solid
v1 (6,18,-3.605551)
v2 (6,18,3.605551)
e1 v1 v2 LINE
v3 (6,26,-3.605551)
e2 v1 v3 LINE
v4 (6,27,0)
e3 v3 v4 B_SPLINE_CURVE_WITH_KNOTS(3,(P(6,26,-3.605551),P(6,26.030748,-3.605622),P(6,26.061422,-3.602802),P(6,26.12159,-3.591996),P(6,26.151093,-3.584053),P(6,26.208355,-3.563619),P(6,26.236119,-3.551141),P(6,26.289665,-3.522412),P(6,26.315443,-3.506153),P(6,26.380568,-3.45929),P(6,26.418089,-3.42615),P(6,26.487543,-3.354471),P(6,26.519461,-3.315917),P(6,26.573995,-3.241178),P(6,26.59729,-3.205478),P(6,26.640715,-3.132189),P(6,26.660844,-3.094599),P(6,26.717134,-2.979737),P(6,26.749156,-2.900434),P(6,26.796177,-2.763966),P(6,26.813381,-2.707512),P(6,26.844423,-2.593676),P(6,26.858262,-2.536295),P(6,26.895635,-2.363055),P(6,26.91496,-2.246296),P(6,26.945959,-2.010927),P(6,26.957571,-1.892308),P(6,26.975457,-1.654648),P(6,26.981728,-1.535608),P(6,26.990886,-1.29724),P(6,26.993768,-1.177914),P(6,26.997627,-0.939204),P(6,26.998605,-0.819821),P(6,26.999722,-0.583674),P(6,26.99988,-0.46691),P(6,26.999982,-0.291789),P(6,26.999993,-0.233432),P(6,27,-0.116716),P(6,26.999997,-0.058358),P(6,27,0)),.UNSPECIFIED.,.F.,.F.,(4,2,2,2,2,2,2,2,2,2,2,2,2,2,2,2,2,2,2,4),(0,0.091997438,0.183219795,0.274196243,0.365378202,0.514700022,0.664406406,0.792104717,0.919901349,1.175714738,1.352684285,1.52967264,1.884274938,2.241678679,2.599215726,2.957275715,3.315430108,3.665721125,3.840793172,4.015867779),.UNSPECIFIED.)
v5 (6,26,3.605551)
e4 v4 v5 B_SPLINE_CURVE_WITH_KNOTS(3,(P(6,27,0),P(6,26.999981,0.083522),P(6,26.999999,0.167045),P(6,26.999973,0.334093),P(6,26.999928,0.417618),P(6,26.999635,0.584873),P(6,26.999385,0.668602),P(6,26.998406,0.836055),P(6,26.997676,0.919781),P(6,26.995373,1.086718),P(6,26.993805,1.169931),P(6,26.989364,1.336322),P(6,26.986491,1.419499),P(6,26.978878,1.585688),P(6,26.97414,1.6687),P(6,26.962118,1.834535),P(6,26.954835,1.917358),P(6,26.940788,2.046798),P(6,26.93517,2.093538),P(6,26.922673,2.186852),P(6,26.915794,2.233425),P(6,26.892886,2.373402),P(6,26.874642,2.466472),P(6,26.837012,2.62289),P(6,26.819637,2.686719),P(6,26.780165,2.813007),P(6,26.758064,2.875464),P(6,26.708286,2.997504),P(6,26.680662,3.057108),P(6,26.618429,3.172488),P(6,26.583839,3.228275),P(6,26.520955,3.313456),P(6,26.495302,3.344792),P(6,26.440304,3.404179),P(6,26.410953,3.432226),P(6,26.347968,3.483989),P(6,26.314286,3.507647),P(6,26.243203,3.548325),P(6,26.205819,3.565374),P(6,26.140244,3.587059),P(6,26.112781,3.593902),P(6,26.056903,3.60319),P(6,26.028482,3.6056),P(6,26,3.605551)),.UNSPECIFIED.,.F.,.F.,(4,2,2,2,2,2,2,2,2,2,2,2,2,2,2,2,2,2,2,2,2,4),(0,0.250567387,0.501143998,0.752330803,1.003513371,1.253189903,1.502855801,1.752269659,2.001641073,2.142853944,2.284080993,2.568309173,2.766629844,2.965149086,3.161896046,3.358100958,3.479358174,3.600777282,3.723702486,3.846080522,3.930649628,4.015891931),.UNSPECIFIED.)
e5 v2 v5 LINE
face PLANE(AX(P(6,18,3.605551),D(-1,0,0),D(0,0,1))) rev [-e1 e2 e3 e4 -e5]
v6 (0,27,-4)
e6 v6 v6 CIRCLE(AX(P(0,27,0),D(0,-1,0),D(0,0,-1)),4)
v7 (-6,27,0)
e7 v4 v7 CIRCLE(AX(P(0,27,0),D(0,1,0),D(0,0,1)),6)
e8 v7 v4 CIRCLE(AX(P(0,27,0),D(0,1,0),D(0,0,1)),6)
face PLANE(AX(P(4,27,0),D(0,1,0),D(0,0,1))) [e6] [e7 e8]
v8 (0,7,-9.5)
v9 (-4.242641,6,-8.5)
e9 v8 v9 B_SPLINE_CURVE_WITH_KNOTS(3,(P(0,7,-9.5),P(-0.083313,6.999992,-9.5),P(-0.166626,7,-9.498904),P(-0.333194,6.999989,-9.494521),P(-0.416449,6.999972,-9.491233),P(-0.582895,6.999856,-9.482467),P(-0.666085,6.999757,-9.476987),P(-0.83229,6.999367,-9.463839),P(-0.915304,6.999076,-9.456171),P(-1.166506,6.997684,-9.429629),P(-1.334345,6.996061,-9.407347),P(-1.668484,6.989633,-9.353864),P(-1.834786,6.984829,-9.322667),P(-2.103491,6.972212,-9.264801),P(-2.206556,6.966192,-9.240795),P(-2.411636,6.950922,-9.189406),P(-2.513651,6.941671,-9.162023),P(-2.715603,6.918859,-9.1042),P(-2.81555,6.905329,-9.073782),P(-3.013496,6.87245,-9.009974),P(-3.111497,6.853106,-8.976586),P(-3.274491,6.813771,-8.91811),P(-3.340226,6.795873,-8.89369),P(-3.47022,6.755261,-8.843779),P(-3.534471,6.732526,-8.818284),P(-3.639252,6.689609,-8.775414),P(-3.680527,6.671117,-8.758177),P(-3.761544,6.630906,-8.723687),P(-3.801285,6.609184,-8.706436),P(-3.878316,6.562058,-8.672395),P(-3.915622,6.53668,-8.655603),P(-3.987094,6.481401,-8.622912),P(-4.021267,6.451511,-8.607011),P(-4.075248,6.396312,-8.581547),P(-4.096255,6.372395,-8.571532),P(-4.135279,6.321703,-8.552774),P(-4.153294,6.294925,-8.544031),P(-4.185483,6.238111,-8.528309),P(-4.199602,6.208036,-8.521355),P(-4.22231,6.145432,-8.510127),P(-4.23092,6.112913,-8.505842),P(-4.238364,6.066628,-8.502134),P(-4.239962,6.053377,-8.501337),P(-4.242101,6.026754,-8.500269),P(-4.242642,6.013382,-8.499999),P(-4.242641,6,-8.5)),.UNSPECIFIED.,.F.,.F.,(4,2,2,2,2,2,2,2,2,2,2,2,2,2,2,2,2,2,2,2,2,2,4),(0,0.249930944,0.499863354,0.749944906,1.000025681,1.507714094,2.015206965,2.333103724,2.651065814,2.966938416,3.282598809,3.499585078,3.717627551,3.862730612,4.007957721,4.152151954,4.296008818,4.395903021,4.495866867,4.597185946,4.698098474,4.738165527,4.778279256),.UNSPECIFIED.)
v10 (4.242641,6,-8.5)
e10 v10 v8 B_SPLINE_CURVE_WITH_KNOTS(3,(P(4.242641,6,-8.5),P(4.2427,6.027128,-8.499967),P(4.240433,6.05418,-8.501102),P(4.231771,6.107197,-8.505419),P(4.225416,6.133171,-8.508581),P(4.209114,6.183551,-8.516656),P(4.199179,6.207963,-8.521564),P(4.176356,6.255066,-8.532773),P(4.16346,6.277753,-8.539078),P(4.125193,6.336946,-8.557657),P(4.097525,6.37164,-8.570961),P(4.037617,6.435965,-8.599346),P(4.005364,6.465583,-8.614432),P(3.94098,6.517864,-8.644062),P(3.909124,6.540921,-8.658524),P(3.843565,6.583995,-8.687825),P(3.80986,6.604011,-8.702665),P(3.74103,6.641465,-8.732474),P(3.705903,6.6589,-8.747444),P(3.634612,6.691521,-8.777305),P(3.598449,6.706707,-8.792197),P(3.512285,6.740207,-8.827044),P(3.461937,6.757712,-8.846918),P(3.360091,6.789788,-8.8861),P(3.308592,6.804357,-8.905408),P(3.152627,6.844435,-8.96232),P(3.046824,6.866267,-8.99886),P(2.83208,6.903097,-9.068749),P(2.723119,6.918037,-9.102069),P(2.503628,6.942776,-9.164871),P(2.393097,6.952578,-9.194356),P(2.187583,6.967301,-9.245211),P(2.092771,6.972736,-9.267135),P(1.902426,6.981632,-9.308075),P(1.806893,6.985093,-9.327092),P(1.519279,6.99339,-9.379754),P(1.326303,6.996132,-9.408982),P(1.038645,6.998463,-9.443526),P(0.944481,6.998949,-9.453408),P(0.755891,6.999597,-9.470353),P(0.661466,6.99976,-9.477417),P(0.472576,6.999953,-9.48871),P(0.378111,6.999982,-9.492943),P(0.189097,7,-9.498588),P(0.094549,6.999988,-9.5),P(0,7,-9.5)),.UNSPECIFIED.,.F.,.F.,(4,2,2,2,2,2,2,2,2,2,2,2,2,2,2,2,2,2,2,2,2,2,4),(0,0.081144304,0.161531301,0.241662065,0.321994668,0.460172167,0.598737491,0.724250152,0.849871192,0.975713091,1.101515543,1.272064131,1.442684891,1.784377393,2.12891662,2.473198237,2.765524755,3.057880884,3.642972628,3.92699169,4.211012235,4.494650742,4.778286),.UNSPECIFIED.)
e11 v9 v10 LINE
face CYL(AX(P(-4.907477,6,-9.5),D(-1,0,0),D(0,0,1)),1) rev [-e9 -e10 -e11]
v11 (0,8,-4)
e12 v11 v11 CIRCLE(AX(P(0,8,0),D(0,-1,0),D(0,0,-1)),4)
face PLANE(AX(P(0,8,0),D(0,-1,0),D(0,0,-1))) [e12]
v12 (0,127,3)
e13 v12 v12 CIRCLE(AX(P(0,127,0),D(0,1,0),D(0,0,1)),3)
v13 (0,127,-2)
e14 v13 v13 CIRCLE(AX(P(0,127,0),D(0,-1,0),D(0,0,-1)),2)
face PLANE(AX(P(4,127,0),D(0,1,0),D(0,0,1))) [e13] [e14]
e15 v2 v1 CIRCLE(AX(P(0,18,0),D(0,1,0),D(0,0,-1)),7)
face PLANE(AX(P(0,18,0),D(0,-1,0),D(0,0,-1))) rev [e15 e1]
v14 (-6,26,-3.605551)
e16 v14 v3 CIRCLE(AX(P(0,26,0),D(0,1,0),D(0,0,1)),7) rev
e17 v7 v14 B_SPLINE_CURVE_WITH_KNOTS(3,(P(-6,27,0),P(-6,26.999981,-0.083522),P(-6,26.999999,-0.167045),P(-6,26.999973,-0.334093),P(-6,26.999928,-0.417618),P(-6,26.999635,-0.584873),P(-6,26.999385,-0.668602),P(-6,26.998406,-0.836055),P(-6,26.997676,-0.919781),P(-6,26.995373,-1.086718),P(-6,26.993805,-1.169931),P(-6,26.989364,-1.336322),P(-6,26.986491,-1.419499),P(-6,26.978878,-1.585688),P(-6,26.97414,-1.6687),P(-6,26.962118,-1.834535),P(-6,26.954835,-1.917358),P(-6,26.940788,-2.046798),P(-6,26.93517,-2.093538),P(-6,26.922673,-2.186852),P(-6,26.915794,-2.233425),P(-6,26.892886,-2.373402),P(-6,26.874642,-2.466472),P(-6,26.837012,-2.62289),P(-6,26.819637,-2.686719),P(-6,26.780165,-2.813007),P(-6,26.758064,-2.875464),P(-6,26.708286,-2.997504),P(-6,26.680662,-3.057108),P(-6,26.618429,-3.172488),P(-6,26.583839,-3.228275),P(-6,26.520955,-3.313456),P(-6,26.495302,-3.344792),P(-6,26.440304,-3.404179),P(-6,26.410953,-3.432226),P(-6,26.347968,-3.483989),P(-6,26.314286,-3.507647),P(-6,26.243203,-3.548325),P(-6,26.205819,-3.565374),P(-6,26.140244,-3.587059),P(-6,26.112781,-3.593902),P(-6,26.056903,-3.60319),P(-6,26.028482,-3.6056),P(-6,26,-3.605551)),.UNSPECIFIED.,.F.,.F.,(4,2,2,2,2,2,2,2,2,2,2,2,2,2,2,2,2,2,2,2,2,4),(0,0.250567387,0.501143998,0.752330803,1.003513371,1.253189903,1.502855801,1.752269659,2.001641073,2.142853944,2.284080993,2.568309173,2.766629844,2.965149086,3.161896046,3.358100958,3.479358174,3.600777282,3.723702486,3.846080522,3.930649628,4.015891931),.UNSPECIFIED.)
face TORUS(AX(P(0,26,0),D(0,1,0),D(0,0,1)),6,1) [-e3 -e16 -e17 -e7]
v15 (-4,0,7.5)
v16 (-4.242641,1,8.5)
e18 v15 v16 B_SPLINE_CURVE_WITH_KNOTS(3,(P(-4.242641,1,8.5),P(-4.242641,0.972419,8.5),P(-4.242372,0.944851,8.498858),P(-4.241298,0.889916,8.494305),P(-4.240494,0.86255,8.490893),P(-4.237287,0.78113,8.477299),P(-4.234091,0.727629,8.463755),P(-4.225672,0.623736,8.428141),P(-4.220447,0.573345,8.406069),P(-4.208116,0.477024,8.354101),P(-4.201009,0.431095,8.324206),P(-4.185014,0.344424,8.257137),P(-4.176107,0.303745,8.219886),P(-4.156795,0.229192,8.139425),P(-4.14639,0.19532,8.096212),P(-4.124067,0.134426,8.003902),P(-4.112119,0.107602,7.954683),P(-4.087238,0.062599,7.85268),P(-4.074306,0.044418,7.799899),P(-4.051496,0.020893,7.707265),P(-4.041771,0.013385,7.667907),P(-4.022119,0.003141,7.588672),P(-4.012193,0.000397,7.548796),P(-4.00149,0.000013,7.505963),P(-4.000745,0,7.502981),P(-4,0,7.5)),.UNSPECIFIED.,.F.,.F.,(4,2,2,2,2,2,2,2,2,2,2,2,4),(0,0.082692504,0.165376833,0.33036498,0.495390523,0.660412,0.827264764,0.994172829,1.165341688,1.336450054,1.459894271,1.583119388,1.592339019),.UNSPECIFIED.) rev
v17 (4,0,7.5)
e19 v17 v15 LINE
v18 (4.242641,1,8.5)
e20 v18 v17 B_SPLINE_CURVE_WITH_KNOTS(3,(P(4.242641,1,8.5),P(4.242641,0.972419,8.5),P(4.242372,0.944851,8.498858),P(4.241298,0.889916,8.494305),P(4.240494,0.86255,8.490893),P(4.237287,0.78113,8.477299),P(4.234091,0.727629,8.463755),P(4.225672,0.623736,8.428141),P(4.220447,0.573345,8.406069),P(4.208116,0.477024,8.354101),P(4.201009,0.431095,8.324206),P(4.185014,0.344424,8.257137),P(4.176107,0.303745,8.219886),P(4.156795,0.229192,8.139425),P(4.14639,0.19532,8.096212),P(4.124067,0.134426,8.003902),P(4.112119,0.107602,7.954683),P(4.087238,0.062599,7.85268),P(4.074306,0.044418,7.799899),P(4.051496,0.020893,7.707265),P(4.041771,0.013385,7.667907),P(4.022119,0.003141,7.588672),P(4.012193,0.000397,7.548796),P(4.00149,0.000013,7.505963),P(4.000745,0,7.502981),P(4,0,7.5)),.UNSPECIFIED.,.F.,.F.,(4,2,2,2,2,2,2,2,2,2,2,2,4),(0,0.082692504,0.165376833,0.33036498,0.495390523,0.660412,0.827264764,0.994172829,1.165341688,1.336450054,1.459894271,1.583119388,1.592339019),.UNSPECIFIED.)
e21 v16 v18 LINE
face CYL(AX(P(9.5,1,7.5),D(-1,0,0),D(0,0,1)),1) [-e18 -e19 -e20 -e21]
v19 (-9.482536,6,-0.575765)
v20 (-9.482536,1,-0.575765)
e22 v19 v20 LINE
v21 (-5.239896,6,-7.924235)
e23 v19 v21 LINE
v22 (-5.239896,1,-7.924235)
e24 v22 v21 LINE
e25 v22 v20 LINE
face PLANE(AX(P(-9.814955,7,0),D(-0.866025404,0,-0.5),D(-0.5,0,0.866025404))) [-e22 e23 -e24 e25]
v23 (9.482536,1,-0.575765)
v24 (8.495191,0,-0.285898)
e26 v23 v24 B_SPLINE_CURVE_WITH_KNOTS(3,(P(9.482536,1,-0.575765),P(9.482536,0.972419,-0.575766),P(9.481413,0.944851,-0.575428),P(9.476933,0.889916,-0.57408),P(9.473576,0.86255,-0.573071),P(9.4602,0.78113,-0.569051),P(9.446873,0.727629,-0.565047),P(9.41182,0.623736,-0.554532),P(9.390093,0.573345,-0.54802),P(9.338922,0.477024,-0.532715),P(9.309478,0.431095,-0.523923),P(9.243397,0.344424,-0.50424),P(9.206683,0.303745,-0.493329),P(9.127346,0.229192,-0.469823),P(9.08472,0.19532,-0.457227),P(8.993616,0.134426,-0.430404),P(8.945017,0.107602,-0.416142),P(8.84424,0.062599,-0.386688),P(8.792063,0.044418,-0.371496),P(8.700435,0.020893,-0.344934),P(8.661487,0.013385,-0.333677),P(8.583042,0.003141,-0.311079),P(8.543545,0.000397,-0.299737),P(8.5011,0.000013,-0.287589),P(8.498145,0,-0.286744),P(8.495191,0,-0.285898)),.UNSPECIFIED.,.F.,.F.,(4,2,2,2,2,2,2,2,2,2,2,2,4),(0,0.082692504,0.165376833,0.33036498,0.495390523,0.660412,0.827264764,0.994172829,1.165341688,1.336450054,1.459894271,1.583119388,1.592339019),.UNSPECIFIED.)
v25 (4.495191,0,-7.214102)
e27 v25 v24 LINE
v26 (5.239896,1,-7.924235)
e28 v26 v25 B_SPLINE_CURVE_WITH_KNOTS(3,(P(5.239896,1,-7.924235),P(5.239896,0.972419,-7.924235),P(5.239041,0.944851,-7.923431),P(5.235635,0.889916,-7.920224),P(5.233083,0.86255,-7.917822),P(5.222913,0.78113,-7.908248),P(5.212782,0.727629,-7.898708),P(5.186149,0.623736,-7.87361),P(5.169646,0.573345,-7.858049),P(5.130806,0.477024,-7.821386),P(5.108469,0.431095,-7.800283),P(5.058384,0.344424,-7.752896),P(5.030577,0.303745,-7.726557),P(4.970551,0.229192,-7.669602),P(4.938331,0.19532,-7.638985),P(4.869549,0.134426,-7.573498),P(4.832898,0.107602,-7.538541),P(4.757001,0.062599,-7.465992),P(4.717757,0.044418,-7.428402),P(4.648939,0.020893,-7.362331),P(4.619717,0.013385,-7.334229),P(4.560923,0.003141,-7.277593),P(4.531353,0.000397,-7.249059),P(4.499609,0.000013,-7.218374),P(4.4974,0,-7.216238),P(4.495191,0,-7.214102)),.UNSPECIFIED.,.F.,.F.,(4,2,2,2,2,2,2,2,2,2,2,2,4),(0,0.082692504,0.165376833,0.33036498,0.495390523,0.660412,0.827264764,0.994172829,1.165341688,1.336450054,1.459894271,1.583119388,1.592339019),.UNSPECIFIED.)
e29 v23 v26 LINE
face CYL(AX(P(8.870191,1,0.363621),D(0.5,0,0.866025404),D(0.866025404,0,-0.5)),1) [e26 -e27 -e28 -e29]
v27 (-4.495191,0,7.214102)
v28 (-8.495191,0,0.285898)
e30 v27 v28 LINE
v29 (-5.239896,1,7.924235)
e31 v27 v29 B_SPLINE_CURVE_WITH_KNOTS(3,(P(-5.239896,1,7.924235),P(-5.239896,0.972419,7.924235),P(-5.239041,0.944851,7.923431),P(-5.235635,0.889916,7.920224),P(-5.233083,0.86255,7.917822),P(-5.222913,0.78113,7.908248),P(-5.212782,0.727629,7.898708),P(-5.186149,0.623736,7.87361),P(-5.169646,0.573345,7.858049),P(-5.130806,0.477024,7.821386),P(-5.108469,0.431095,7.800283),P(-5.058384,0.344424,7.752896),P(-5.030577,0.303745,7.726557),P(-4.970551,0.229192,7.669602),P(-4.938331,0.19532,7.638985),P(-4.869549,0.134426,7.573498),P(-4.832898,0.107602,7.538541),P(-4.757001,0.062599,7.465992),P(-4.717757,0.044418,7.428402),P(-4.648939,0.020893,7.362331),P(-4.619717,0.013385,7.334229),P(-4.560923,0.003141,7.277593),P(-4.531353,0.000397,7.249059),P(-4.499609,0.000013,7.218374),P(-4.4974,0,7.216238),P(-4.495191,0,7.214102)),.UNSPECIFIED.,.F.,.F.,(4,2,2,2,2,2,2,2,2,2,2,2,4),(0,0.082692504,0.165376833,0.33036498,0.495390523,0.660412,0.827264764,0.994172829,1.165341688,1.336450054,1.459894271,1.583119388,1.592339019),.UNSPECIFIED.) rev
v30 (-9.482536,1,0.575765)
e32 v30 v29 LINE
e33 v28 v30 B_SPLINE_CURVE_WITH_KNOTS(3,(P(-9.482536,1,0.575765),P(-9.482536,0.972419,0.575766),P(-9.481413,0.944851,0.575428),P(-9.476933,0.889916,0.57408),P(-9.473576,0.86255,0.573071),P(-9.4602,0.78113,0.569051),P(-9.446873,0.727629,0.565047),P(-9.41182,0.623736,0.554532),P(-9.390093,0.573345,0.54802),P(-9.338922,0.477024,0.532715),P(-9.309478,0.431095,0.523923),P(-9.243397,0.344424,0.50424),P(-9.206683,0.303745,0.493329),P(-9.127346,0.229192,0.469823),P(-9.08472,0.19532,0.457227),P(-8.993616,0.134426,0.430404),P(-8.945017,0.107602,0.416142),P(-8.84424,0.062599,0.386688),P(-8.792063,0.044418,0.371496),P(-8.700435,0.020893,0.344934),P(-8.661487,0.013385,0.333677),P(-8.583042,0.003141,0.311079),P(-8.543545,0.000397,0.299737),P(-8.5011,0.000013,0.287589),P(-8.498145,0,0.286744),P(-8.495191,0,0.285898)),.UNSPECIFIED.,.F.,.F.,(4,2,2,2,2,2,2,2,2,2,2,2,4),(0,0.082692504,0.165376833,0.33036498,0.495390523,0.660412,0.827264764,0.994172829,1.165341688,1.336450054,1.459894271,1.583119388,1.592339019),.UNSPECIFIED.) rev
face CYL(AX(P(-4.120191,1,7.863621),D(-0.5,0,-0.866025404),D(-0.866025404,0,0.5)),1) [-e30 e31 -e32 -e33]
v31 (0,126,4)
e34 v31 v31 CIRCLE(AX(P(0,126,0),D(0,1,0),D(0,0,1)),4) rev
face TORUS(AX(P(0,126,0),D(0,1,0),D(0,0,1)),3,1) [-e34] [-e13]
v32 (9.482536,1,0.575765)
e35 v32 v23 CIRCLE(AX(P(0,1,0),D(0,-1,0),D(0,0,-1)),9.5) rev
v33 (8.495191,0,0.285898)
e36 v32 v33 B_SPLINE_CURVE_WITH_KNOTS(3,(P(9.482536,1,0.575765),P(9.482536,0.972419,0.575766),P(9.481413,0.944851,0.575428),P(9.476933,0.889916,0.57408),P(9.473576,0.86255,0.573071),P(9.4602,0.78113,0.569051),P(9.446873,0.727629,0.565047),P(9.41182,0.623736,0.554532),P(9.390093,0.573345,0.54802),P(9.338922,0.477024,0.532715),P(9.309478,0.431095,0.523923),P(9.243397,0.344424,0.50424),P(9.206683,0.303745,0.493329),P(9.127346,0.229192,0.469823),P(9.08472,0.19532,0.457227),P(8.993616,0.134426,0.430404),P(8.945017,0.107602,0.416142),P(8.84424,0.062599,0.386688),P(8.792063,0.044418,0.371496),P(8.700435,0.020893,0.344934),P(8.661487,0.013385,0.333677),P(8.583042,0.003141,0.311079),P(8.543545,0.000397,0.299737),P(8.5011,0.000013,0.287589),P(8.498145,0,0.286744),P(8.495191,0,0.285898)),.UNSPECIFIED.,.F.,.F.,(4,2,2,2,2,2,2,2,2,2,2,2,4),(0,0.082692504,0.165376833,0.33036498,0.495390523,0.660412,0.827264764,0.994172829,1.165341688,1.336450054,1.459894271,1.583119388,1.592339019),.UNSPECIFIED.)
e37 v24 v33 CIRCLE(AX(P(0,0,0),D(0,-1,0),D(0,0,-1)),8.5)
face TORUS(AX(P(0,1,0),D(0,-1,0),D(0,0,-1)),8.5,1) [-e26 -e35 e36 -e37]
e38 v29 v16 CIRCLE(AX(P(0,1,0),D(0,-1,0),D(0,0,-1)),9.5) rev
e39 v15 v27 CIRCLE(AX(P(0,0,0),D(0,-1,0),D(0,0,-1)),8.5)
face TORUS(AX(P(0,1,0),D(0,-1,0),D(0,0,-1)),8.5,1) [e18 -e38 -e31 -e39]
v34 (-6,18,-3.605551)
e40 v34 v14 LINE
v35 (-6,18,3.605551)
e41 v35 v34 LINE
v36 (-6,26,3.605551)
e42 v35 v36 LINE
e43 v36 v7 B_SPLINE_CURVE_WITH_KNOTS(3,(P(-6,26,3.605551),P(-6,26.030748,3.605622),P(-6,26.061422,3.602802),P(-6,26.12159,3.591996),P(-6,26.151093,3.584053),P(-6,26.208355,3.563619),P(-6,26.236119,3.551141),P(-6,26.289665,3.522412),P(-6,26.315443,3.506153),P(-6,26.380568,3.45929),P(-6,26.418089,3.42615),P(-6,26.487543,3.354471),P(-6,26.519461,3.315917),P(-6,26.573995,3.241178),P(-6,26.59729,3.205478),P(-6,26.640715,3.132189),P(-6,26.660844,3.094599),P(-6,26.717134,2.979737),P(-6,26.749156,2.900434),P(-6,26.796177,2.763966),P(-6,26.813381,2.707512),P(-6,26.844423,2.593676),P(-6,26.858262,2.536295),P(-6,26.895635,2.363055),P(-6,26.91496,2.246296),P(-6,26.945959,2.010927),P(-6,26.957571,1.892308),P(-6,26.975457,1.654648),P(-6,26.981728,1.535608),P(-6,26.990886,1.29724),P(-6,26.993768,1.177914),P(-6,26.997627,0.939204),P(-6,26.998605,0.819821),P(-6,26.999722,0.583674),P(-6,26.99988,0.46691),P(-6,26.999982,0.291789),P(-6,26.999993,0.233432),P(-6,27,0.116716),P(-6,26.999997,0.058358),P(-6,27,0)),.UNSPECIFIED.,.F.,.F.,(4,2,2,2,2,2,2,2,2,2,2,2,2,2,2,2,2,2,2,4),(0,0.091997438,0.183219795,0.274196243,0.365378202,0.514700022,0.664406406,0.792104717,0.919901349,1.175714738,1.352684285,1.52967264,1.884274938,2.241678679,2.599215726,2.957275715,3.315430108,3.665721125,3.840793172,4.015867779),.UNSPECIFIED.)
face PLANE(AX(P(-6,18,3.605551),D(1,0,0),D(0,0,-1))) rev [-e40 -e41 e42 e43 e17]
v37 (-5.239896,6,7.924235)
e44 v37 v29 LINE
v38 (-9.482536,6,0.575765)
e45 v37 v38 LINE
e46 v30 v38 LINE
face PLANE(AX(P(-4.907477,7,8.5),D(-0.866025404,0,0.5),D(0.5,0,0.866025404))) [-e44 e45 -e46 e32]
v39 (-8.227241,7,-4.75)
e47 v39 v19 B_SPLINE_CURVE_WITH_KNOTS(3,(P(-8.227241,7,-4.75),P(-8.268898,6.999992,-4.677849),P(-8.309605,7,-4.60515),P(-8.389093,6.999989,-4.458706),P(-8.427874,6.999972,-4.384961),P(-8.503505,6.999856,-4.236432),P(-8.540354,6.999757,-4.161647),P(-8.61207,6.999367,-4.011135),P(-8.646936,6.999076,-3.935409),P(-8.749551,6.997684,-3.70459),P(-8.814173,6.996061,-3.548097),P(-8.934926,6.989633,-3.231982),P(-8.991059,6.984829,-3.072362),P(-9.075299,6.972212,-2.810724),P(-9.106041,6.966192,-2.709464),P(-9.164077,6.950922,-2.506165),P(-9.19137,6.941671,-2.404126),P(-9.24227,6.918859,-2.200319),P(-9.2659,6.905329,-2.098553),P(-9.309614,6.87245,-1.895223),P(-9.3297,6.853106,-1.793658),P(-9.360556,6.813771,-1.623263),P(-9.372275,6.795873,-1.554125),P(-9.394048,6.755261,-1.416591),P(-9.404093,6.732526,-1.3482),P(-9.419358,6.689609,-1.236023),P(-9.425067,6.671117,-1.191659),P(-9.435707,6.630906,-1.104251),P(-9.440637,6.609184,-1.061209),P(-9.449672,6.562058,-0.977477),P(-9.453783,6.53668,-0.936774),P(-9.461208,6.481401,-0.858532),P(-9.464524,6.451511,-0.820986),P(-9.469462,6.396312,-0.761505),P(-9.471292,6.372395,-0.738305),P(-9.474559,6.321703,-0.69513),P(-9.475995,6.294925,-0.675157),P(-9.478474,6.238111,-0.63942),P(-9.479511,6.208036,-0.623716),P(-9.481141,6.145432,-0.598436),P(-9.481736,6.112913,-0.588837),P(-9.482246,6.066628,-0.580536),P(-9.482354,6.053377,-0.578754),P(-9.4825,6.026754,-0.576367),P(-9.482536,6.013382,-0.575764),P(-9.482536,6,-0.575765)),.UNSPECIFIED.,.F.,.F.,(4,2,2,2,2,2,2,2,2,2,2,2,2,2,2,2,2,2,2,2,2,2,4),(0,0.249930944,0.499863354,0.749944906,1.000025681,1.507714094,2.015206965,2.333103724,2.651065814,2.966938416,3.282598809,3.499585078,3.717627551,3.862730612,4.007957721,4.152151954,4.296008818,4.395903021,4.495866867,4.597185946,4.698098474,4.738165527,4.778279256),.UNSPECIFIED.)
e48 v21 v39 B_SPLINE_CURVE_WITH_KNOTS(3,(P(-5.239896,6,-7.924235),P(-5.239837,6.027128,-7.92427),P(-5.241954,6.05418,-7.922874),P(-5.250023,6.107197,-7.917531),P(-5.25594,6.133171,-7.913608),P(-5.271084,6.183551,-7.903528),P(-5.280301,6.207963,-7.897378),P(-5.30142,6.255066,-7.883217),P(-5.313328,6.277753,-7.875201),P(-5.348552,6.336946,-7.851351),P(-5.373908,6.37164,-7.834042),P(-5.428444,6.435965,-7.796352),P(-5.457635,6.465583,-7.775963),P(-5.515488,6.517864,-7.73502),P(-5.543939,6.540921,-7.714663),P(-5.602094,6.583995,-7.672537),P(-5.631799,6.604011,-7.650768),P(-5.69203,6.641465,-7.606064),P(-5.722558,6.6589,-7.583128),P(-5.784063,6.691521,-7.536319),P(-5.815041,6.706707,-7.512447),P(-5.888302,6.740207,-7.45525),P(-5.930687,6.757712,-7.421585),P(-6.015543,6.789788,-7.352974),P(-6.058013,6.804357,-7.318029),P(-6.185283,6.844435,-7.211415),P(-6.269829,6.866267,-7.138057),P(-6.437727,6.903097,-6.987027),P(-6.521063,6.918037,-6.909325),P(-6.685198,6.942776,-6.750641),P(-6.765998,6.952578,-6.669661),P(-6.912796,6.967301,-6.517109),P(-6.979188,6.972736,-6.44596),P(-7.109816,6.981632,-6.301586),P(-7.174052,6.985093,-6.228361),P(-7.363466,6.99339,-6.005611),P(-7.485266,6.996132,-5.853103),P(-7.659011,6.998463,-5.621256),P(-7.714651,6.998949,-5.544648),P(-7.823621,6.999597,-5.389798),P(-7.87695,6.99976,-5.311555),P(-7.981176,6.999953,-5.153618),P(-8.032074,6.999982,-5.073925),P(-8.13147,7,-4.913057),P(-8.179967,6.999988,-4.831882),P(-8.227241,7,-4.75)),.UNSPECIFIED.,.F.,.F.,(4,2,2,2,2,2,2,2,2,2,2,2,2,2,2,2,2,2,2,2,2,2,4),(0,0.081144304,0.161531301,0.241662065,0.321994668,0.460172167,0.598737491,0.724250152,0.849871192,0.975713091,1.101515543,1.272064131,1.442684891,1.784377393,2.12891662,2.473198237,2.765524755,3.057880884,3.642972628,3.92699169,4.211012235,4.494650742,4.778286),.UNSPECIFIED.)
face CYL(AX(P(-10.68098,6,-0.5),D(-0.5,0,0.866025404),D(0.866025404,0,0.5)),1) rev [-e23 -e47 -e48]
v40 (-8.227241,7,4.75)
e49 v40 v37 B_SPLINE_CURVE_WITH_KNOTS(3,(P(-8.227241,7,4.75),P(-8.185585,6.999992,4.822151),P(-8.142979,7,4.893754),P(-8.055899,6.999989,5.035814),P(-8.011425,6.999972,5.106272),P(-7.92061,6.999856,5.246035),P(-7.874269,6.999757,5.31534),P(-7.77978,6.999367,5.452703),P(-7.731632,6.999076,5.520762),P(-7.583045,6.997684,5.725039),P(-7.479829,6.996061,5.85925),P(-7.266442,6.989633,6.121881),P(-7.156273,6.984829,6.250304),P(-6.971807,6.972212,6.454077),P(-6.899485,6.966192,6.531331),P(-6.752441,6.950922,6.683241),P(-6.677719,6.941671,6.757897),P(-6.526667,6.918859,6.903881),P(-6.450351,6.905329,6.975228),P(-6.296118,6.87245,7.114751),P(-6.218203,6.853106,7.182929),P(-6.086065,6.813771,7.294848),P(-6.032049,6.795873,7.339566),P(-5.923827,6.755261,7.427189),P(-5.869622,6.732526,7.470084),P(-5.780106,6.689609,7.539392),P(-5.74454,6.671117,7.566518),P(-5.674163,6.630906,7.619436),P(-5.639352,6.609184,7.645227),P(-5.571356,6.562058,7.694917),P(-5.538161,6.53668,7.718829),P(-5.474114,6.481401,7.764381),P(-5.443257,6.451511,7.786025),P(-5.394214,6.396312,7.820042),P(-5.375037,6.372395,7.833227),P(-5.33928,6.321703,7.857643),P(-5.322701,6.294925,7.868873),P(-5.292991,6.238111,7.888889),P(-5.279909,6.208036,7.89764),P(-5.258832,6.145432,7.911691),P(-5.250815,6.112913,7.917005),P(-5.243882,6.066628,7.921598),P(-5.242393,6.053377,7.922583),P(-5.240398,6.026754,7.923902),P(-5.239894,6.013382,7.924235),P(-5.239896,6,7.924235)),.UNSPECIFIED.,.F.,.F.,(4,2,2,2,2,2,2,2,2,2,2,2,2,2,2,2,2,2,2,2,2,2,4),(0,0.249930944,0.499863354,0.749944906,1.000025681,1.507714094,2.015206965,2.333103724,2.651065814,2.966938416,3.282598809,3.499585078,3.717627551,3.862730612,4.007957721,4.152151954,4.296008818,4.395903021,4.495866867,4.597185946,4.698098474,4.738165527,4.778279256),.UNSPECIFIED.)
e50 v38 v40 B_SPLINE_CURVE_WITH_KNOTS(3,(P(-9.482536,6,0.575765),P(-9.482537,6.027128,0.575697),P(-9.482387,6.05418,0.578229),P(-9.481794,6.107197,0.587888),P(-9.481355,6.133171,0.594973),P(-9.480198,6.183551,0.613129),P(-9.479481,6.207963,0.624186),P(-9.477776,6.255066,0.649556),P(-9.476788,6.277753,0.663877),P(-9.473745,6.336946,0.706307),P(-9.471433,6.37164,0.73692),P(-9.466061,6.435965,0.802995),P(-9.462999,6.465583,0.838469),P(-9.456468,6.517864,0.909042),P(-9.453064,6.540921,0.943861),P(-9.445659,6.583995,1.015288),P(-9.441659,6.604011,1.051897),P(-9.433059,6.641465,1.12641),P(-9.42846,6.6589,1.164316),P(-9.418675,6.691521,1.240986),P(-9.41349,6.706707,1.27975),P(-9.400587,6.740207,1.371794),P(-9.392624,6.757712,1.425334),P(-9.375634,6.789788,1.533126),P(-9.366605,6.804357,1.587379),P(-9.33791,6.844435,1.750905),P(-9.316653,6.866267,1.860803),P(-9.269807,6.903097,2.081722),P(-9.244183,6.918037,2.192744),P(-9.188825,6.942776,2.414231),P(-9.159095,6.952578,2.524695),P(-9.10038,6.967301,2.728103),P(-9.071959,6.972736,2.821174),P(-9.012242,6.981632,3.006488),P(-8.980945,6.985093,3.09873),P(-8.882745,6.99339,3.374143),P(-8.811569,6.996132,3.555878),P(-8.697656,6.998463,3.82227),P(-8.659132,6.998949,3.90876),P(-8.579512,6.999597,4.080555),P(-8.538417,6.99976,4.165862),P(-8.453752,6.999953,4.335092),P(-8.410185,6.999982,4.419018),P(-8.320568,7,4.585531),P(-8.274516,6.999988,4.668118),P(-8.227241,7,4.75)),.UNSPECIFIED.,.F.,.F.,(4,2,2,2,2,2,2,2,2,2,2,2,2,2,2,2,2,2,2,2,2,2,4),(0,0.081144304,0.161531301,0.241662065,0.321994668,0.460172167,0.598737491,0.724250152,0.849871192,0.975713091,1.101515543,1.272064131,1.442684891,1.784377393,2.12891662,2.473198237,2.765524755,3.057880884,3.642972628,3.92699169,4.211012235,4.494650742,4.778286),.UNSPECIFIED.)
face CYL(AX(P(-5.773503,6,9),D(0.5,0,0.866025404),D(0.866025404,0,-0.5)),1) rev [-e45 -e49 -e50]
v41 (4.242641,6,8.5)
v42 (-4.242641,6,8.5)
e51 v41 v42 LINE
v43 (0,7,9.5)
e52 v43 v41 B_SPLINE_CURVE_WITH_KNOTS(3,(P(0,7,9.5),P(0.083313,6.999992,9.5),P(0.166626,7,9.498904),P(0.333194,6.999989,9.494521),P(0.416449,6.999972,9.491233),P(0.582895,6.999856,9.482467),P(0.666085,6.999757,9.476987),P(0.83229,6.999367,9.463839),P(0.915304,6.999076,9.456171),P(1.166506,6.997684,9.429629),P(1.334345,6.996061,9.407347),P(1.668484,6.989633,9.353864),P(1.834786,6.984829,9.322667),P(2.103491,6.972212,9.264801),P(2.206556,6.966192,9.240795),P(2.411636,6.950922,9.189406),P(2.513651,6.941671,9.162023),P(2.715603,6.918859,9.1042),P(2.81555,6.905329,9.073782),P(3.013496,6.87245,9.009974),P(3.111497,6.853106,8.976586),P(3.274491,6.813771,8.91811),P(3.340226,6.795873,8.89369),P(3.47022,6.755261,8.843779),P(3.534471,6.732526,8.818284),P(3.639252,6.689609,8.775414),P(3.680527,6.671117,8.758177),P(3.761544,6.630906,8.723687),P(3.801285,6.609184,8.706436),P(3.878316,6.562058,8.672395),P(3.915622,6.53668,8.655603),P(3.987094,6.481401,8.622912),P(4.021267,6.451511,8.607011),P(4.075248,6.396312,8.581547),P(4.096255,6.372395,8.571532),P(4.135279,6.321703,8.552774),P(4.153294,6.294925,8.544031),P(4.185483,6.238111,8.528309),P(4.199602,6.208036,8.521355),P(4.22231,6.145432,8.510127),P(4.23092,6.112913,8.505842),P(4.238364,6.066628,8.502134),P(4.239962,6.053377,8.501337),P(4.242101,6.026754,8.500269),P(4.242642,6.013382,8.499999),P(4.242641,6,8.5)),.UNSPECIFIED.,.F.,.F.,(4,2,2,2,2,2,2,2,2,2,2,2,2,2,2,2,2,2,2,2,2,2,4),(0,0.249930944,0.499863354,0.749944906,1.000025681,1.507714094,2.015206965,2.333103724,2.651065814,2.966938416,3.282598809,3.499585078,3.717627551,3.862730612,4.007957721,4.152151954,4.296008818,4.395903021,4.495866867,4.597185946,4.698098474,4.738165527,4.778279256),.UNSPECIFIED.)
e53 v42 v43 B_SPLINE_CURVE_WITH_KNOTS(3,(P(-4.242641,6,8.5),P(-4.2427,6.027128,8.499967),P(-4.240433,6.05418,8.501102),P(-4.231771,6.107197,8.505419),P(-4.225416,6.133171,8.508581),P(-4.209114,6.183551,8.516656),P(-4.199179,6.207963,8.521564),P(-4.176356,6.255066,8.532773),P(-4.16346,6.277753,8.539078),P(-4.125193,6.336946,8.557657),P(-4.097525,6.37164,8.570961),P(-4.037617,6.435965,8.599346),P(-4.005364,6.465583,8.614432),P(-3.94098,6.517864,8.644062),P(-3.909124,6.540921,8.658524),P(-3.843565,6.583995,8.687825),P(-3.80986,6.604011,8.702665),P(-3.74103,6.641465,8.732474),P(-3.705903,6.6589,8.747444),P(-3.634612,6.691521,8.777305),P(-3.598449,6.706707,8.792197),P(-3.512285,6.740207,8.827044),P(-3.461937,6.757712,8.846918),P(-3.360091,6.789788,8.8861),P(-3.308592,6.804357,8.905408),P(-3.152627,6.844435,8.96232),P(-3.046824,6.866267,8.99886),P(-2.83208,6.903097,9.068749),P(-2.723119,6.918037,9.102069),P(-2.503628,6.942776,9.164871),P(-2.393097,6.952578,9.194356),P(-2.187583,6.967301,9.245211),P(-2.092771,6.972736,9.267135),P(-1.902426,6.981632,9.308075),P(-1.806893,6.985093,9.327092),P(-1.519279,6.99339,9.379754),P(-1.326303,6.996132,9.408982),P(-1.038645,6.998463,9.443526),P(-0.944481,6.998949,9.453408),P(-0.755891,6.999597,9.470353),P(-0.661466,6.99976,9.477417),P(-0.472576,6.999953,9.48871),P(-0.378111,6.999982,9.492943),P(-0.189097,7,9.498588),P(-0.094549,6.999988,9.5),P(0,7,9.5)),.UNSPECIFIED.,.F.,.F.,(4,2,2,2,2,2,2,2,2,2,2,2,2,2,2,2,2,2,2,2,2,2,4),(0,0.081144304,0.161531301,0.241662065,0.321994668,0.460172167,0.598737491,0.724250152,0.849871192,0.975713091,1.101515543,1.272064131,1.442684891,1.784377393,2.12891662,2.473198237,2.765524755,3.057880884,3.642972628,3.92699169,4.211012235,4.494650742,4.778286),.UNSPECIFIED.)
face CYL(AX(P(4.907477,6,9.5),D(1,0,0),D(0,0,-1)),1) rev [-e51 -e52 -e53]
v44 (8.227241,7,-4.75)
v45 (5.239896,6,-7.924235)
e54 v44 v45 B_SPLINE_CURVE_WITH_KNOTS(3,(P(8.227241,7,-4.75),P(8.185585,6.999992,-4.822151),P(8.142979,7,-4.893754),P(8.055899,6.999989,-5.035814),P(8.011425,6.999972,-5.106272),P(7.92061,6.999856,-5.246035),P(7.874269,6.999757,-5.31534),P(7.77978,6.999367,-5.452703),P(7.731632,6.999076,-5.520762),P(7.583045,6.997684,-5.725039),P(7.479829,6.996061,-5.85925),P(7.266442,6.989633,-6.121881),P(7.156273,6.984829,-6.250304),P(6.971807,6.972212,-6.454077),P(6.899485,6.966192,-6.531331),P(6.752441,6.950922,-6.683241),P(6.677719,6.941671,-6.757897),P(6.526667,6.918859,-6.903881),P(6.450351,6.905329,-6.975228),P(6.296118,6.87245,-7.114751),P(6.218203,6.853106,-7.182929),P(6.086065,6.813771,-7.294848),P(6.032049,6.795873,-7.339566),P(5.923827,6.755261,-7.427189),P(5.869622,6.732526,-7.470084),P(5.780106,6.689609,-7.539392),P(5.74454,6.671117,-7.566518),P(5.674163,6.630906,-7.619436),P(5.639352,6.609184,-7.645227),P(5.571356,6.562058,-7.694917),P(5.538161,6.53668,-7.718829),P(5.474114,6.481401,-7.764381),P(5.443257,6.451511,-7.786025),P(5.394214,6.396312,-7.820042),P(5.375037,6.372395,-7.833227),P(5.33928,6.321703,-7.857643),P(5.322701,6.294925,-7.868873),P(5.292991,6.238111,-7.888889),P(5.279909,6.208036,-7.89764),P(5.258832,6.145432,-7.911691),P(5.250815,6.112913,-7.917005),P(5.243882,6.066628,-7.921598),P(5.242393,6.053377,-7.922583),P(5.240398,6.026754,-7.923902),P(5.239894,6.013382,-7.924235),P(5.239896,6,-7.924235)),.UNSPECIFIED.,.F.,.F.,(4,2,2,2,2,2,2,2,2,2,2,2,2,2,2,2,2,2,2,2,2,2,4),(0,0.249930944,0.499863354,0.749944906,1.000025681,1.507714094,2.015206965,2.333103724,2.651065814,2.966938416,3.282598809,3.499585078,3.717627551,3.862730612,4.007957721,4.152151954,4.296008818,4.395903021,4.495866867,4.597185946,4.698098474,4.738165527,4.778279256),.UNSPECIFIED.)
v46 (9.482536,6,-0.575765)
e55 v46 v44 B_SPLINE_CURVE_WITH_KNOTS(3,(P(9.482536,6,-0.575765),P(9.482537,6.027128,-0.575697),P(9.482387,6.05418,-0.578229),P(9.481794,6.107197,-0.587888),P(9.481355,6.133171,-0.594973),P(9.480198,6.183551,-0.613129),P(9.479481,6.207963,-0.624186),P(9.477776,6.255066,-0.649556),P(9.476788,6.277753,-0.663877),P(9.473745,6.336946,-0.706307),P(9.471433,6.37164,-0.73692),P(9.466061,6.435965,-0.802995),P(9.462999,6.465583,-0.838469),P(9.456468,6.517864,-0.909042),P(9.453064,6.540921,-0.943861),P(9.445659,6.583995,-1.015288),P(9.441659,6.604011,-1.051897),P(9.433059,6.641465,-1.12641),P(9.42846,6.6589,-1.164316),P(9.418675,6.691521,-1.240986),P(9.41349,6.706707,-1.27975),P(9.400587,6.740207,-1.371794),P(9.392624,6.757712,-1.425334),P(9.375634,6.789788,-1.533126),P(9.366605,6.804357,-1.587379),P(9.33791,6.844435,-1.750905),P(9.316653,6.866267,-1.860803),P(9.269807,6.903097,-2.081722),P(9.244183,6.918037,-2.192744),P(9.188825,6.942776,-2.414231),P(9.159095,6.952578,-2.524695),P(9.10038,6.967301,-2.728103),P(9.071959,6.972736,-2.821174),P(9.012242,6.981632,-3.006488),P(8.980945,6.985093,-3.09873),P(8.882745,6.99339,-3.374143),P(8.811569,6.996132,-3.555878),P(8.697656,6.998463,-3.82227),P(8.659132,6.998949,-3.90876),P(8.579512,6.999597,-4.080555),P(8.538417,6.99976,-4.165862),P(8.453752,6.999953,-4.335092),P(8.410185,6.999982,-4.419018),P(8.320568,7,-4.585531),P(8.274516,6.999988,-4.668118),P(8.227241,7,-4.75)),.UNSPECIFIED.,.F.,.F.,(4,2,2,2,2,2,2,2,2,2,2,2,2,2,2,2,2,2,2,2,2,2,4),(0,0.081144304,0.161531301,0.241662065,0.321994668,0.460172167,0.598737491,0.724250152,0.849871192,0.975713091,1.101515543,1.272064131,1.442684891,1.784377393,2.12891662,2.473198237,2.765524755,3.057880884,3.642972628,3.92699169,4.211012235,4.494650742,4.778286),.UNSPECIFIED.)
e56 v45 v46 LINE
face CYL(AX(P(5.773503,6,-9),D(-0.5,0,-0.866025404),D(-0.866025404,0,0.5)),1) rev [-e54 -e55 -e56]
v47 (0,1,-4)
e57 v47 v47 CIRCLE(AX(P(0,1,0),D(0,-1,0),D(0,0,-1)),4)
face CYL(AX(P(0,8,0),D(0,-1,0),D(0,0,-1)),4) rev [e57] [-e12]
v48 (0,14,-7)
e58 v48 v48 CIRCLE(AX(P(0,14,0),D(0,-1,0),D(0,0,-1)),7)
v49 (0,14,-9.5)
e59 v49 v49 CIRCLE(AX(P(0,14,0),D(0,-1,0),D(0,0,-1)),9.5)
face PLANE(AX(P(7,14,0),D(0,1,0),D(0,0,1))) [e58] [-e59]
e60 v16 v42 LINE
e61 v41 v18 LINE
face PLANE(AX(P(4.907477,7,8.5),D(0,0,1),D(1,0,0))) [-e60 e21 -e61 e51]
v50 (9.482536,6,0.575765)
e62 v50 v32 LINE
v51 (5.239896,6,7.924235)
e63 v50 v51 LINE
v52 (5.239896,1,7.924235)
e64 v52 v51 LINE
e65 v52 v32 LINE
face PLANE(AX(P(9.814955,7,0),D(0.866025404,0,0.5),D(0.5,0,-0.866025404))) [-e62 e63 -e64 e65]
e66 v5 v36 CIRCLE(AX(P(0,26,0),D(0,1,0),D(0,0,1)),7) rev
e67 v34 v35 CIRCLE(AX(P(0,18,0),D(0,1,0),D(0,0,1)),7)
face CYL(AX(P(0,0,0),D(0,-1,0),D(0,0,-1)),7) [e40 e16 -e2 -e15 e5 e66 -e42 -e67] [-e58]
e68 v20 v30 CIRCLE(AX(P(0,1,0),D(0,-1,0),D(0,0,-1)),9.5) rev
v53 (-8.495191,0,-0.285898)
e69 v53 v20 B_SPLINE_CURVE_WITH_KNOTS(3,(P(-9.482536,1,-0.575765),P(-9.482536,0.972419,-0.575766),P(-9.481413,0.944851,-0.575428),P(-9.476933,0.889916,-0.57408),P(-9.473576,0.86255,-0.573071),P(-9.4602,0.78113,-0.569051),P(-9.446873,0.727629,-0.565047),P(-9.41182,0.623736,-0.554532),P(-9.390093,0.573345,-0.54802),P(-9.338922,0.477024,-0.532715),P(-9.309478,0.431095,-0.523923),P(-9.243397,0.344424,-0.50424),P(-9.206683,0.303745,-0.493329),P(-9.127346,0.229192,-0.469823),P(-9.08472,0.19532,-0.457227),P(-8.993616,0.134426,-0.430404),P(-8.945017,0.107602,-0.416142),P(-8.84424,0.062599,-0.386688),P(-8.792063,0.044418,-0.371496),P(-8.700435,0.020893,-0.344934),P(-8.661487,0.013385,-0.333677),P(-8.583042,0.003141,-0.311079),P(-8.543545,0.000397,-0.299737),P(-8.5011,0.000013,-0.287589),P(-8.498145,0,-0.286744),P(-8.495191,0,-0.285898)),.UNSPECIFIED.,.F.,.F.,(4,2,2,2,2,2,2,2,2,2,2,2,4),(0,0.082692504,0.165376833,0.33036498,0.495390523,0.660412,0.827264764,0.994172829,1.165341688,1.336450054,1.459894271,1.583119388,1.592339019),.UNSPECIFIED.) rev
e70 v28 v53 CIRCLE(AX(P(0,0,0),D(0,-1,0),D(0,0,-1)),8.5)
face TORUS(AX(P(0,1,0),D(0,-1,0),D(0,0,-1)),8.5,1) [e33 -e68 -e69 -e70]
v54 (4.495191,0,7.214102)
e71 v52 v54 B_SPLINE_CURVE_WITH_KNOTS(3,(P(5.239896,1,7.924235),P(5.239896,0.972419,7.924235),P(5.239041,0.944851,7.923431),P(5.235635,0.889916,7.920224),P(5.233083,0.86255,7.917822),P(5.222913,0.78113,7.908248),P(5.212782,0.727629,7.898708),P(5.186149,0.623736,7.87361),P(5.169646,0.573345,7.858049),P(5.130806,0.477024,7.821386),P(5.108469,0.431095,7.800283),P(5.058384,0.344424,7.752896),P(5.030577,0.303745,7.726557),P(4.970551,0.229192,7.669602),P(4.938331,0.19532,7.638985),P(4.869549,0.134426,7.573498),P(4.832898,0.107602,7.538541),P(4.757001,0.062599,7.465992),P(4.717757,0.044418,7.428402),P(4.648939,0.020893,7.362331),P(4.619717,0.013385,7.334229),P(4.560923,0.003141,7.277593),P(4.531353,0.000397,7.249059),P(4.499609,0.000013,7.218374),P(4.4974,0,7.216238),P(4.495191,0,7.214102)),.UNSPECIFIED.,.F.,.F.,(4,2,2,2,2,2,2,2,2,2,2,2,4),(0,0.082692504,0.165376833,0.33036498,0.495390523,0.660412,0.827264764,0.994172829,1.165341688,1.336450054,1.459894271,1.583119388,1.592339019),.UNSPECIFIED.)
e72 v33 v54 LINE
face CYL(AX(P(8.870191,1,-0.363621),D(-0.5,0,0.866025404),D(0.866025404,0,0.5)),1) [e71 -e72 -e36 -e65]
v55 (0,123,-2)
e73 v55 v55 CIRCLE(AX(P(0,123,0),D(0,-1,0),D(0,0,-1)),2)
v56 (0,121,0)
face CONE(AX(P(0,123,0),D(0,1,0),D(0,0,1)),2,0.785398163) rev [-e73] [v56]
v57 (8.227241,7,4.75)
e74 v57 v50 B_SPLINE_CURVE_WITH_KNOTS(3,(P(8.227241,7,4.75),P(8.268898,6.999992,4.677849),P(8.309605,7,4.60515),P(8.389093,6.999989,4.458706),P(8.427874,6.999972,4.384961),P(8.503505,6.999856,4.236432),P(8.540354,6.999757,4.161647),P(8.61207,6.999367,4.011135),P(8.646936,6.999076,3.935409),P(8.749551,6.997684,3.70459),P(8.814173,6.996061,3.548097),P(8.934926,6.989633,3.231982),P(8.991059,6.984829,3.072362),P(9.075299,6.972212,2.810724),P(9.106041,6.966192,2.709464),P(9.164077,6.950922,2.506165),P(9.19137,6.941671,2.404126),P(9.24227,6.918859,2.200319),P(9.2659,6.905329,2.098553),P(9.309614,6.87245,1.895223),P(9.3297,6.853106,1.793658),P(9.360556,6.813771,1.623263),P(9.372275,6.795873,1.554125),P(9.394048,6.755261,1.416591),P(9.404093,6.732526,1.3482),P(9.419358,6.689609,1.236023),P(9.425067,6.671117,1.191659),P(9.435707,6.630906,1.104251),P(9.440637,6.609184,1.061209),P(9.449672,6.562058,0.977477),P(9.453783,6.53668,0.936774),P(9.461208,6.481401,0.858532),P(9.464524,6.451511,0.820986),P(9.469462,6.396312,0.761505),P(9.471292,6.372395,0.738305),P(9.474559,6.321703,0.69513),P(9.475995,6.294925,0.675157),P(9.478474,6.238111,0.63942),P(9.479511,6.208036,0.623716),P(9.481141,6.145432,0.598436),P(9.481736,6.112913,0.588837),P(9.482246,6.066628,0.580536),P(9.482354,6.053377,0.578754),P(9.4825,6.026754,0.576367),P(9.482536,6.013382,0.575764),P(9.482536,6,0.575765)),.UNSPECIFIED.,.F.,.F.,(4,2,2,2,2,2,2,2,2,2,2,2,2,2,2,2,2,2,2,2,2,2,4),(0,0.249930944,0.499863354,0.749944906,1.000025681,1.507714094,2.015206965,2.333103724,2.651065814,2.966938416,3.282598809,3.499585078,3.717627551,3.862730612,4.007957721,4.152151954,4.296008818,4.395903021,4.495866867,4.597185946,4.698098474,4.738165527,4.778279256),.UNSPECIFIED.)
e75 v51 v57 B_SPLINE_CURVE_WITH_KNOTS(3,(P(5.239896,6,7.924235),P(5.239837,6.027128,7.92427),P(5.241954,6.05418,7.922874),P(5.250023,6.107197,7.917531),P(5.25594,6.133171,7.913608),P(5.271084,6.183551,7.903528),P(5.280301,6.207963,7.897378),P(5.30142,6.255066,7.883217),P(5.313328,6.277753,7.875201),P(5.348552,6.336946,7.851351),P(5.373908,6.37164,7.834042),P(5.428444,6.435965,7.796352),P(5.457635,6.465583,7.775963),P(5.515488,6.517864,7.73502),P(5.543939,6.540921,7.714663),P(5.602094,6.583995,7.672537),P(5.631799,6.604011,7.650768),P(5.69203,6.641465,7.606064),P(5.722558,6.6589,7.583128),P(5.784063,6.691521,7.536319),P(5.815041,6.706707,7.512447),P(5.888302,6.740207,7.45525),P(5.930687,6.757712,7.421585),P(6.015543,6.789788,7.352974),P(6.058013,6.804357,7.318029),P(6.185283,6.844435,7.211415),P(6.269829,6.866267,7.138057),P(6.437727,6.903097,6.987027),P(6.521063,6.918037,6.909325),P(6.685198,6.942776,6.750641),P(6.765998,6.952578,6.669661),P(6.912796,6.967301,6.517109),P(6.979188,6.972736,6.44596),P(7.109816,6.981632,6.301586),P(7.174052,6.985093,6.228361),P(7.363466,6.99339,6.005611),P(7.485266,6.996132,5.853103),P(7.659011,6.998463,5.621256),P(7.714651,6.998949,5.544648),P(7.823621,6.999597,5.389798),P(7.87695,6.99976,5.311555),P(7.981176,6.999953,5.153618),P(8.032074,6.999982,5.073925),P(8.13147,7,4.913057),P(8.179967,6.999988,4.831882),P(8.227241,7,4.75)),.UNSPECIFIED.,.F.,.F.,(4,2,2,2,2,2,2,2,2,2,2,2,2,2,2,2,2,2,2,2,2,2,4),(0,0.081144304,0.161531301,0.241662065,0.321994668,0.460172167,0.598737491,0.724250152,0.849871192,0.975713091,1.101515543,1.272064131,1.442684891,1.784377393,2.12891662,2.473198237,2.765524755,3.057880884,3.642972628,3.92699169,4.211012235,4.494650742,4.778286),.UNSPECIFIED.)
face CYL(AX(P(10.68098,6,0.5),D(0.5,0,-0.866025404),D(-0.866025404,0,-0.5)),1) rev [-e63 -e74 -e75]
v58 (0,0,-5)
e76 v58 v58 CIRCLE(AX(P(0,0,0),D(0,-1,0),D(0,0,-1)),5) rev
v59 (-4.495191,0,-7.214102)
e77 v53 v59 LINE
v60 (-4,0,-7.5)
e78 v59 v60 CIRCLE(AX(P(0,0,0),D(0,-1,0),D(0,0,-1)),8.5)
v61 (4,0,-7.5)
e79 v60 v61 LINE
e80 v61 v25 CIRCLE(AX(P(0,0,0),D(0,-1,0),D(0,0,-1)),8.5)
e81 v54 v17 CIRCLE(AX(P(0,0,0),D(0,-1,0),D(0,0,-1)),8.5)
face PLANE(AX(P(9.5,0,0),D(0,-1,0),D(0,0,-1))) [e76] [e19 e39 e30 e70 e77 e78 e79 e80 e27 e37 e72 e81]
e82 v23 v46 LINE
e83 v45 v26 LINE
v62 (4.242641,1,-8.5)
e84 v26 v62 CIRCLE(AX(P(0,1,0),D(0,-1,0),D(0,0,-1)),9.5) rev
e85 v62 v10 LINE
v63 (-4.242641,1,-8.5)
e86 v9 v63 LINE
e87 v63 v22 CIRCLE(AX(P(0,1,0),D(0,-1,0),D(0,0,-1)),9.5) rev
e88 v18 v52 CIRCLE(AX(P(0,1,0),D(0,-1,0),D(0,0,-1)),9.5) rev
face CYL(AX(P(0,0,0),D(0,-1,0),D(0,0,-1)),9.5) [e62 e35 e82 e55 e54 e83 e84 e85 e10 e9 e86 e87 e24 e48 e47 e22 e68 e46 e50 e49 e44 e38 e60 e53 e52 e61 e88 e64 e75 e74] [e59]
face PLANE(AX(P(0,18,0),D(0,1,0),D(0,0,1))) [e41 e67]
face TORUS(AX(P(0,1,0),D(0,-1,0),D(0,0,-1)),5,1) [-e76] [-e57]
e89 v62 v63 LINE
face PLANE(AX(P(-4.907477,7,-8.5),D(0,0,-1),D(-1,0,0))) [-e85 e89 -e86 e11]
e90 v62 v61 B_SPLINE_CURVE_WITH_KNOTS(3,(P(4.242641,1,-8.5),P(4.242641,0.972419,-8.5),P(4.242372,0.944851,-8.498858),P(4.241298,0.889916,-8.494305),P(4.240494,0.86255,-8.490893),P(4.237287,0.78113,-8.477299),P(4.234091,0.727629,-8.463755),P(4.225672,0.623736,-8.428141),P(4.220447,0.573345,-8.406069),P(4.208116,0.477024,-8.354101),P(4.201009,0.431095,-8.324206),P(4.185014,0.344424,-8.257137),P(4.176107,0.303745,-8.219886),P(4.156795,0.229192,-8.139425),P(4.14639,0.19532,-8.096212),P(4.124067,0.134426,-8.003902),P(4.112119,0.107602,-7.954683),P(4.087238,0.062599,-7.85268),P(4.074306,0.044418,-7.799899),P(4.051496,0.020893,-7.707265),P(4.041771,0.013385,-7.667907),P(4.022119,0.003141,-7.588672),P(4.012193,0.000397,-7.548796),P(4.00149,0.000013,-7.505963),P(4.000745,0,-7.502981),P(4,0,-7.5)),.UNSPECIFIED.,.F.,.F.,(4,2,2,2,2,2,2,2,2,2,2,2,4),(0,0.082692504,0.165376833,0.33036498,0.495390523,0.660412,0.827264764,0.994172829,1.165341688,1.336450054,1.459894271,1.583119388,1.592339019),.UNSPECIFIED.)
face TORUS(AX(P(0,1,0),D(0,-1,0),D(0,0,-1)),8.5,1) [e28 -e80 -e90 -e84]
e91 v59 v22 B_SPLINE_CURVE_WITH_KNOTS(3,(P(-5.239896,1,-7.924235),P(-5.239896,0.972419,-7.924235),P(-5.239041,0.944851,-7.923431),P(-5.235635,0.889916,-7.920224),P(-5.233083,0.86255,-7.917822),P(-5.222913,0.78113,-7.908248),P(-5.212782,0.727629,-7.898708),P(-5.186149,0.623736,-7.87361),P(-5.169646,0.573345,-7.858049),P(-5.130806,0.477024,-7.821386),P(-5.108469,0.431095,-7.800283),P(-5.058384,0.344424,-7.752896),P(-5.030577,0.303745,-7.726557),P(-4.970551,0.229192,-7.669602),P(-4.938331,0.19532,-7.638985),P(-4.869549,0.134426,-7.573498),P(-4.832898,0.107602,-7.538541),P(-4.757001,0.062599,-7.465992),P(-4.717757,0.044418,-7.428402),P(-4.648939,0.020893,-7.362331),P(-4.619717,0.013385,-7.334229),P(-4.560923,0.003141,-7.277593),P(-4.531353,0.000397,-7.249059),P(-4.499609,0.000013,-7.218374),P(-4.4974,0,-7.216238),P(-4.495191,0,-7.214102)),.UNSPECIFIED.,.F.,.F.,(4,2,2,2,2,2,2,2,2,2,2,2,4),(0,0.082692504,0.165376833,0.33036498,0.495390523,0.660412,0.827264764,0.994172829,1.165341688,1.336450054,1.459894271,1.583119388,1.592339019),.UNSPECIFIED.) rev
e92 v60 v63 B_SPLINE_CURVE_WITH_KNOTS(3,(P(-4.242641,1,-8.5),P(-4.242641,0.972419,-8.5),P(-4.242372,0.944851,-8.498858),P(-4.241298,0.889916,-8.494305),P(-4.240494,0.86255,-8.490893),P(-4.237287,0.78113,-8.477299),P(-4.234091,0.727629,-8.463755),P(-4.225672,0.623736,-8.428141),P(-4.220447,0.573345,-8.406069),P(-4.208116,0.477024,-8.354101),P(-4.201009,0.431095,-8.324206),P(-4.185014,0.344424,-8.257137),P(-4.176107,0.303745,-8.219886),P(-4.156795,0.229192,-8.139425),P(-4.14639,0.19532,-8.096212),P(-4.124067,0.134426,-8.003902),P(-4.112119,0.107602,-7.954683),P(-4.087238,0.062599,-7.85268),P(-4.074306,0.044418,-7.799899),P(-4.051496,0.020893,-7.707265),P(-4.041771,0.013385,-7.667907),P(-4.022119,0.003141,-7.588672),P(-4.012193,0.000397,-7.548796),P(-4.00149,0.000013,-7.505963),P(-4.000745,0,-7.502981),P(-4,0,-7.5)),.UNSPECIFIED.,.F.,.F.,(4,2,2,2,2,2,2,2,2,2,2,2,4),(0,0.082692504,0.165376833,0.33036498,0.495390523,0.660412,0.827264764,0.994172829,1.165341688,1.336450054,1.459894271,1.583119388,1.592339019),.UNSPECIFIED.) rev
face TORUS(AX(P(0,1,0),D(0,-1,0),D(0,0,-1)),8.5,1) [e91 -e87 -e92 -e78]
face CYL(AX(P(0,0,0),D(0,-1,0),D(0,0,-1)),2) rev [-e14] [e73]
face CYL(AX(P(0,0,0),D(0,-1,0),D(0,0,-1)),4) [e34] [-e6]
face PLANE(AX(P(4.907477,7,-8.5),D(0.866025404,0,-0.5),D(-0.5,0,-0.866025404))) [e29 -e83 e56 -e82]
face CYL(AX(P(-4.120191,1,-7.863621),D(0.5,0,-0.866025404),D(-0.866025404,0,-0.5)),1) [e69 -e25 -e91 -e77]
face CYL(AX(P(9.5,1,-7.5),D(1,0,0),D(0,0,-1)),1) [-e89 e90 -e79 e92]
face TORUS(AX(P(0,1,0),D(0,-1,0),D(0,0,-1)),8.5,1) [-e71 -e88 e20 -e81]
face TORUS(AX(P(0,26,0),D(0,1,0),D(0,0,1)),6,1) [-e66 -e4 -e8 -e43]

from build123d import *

# Parameters (mm, degrees)
ESQUISSE2_R             = 4
ENL_V_MAT_EXTRU_1_DEPTH = 8
ENL_V_START             = -9
ENL_V_MAT_EXTRU_2_DEPTH = 9
ESQUISSE4_R             = 15
ENL_V_MAT_EXTRU_3_DEPTH = 7
CONG_1_R                = 1


with BuildPart() as part:
    # Esquisse1 → Révolution1 (revolve)
    with BuildSketch(Plane.XY, mode=Mode.PRIVATE) as r_volution1_sk:
        Polygon((4, 127), (4, 27), (7, 27), (7, 14), (9.5, 14), (9.5, 0), (0, 0), (0, 121), (2, 123), (2, 127), align=None)
    revolve(r_volution1_sk.sketch.rotate(Axis((0, 0, 0), (0, 1, 0)), 90), axis=Axis((0, 0, 0), (0, 1, 0)))

    # Esquisse2 → Enlèv. mat.-Extru.1 (cut)
    with BuildSketch(Plane.XZ):
        with Locations(Location((0, 0, 0), (0, 0, 270))):
            Circle(ESQUISSE2_R)
    extrude(amount=-ENL_V_MAT_EXTRU_1_DEPTH, mode=Mode.SUBTRACT)

    # Esquisse3 → Enlèv. mat.-Extru.2 (cut)
    with BuildSketch(Plane(origin=(0, 27, 0), x_dir=(1, 0, 0), z_dir=(0, 1, 0)).offset(ENL_V_START)):
        with BuildLine():
            Line((6, -3.605551275), (6, 3.605551275))
            ThreePointArc((6, 3.605551275), (7, 0), (6, -3.605551275))
        make_face()
        with BuildLine():
            Line((-6, -3.605551275), (-6, 3.605551275))
            ThreePointArc((-6, 3.605551275), (-7, 0), (-6, -3.605551275))
        make_face()
    extrude(amount=ENL_V_MAT_EXTRU_2_DEPTH, mode=Mode.SUBTRACT)

    # Esquisse4 → Enlèv. mat.-Extru.3 (cut)
    with BuildSketch(Plane.XZ):
        Circle(ESQUISSE4_R)
        Polygon((9.814954576, 0), (4.907477288, 8.5), (-4.907477288, 8.5), (-9.814954576, 0), (-4.907477288, -8.5), (4.907477288, -8.5), align=None, mode=Mode.SUBTRACT)
    extrude(amount=-ENL_V_MAT_EXTRU_3_DEPTH, mode=Mode.SUBTRACT)

    # Congé1
    cong_1_edges = [part.edges().sort_by_distance(p)[0] for p in [
        (0, 127, 4),
        (-3.446820352, 27, -6.092571663),
        (0, 27, 7),
        (0, 0, -8.5),
        (-4.75, 0, -8.227241336),
        (-7.361215932, 0, -4.25),
        (-9.5, 0, 0),
        (-7.361215932, 0, 4.25),
        (-4.75, 0, 8.227241336),
        (0, 0, 8.5),
        (4.75, 0, 8.227241336),
        (7.361215932, 0, 4.25),
        (9.5, 0, 0),
        (7.361215932, 0, -4.25),
        (4.75, 0, -8.227241336),
        (0, 0, 4),
        (0, 7, 8.5),
        (7.361215932, 7, 4.25),
        (7.361215932, 7, -4.25),
        (0, 7, -8.5),
        (-7.361215932, 7, -4.25),
        (-7.361215932, 7, 4.25),
    ]]
    fillet(cong_1_edges, radius=CONG_1_R - 0.0001)  # a hair under: the kernel refuses the full size


solid = part.part
